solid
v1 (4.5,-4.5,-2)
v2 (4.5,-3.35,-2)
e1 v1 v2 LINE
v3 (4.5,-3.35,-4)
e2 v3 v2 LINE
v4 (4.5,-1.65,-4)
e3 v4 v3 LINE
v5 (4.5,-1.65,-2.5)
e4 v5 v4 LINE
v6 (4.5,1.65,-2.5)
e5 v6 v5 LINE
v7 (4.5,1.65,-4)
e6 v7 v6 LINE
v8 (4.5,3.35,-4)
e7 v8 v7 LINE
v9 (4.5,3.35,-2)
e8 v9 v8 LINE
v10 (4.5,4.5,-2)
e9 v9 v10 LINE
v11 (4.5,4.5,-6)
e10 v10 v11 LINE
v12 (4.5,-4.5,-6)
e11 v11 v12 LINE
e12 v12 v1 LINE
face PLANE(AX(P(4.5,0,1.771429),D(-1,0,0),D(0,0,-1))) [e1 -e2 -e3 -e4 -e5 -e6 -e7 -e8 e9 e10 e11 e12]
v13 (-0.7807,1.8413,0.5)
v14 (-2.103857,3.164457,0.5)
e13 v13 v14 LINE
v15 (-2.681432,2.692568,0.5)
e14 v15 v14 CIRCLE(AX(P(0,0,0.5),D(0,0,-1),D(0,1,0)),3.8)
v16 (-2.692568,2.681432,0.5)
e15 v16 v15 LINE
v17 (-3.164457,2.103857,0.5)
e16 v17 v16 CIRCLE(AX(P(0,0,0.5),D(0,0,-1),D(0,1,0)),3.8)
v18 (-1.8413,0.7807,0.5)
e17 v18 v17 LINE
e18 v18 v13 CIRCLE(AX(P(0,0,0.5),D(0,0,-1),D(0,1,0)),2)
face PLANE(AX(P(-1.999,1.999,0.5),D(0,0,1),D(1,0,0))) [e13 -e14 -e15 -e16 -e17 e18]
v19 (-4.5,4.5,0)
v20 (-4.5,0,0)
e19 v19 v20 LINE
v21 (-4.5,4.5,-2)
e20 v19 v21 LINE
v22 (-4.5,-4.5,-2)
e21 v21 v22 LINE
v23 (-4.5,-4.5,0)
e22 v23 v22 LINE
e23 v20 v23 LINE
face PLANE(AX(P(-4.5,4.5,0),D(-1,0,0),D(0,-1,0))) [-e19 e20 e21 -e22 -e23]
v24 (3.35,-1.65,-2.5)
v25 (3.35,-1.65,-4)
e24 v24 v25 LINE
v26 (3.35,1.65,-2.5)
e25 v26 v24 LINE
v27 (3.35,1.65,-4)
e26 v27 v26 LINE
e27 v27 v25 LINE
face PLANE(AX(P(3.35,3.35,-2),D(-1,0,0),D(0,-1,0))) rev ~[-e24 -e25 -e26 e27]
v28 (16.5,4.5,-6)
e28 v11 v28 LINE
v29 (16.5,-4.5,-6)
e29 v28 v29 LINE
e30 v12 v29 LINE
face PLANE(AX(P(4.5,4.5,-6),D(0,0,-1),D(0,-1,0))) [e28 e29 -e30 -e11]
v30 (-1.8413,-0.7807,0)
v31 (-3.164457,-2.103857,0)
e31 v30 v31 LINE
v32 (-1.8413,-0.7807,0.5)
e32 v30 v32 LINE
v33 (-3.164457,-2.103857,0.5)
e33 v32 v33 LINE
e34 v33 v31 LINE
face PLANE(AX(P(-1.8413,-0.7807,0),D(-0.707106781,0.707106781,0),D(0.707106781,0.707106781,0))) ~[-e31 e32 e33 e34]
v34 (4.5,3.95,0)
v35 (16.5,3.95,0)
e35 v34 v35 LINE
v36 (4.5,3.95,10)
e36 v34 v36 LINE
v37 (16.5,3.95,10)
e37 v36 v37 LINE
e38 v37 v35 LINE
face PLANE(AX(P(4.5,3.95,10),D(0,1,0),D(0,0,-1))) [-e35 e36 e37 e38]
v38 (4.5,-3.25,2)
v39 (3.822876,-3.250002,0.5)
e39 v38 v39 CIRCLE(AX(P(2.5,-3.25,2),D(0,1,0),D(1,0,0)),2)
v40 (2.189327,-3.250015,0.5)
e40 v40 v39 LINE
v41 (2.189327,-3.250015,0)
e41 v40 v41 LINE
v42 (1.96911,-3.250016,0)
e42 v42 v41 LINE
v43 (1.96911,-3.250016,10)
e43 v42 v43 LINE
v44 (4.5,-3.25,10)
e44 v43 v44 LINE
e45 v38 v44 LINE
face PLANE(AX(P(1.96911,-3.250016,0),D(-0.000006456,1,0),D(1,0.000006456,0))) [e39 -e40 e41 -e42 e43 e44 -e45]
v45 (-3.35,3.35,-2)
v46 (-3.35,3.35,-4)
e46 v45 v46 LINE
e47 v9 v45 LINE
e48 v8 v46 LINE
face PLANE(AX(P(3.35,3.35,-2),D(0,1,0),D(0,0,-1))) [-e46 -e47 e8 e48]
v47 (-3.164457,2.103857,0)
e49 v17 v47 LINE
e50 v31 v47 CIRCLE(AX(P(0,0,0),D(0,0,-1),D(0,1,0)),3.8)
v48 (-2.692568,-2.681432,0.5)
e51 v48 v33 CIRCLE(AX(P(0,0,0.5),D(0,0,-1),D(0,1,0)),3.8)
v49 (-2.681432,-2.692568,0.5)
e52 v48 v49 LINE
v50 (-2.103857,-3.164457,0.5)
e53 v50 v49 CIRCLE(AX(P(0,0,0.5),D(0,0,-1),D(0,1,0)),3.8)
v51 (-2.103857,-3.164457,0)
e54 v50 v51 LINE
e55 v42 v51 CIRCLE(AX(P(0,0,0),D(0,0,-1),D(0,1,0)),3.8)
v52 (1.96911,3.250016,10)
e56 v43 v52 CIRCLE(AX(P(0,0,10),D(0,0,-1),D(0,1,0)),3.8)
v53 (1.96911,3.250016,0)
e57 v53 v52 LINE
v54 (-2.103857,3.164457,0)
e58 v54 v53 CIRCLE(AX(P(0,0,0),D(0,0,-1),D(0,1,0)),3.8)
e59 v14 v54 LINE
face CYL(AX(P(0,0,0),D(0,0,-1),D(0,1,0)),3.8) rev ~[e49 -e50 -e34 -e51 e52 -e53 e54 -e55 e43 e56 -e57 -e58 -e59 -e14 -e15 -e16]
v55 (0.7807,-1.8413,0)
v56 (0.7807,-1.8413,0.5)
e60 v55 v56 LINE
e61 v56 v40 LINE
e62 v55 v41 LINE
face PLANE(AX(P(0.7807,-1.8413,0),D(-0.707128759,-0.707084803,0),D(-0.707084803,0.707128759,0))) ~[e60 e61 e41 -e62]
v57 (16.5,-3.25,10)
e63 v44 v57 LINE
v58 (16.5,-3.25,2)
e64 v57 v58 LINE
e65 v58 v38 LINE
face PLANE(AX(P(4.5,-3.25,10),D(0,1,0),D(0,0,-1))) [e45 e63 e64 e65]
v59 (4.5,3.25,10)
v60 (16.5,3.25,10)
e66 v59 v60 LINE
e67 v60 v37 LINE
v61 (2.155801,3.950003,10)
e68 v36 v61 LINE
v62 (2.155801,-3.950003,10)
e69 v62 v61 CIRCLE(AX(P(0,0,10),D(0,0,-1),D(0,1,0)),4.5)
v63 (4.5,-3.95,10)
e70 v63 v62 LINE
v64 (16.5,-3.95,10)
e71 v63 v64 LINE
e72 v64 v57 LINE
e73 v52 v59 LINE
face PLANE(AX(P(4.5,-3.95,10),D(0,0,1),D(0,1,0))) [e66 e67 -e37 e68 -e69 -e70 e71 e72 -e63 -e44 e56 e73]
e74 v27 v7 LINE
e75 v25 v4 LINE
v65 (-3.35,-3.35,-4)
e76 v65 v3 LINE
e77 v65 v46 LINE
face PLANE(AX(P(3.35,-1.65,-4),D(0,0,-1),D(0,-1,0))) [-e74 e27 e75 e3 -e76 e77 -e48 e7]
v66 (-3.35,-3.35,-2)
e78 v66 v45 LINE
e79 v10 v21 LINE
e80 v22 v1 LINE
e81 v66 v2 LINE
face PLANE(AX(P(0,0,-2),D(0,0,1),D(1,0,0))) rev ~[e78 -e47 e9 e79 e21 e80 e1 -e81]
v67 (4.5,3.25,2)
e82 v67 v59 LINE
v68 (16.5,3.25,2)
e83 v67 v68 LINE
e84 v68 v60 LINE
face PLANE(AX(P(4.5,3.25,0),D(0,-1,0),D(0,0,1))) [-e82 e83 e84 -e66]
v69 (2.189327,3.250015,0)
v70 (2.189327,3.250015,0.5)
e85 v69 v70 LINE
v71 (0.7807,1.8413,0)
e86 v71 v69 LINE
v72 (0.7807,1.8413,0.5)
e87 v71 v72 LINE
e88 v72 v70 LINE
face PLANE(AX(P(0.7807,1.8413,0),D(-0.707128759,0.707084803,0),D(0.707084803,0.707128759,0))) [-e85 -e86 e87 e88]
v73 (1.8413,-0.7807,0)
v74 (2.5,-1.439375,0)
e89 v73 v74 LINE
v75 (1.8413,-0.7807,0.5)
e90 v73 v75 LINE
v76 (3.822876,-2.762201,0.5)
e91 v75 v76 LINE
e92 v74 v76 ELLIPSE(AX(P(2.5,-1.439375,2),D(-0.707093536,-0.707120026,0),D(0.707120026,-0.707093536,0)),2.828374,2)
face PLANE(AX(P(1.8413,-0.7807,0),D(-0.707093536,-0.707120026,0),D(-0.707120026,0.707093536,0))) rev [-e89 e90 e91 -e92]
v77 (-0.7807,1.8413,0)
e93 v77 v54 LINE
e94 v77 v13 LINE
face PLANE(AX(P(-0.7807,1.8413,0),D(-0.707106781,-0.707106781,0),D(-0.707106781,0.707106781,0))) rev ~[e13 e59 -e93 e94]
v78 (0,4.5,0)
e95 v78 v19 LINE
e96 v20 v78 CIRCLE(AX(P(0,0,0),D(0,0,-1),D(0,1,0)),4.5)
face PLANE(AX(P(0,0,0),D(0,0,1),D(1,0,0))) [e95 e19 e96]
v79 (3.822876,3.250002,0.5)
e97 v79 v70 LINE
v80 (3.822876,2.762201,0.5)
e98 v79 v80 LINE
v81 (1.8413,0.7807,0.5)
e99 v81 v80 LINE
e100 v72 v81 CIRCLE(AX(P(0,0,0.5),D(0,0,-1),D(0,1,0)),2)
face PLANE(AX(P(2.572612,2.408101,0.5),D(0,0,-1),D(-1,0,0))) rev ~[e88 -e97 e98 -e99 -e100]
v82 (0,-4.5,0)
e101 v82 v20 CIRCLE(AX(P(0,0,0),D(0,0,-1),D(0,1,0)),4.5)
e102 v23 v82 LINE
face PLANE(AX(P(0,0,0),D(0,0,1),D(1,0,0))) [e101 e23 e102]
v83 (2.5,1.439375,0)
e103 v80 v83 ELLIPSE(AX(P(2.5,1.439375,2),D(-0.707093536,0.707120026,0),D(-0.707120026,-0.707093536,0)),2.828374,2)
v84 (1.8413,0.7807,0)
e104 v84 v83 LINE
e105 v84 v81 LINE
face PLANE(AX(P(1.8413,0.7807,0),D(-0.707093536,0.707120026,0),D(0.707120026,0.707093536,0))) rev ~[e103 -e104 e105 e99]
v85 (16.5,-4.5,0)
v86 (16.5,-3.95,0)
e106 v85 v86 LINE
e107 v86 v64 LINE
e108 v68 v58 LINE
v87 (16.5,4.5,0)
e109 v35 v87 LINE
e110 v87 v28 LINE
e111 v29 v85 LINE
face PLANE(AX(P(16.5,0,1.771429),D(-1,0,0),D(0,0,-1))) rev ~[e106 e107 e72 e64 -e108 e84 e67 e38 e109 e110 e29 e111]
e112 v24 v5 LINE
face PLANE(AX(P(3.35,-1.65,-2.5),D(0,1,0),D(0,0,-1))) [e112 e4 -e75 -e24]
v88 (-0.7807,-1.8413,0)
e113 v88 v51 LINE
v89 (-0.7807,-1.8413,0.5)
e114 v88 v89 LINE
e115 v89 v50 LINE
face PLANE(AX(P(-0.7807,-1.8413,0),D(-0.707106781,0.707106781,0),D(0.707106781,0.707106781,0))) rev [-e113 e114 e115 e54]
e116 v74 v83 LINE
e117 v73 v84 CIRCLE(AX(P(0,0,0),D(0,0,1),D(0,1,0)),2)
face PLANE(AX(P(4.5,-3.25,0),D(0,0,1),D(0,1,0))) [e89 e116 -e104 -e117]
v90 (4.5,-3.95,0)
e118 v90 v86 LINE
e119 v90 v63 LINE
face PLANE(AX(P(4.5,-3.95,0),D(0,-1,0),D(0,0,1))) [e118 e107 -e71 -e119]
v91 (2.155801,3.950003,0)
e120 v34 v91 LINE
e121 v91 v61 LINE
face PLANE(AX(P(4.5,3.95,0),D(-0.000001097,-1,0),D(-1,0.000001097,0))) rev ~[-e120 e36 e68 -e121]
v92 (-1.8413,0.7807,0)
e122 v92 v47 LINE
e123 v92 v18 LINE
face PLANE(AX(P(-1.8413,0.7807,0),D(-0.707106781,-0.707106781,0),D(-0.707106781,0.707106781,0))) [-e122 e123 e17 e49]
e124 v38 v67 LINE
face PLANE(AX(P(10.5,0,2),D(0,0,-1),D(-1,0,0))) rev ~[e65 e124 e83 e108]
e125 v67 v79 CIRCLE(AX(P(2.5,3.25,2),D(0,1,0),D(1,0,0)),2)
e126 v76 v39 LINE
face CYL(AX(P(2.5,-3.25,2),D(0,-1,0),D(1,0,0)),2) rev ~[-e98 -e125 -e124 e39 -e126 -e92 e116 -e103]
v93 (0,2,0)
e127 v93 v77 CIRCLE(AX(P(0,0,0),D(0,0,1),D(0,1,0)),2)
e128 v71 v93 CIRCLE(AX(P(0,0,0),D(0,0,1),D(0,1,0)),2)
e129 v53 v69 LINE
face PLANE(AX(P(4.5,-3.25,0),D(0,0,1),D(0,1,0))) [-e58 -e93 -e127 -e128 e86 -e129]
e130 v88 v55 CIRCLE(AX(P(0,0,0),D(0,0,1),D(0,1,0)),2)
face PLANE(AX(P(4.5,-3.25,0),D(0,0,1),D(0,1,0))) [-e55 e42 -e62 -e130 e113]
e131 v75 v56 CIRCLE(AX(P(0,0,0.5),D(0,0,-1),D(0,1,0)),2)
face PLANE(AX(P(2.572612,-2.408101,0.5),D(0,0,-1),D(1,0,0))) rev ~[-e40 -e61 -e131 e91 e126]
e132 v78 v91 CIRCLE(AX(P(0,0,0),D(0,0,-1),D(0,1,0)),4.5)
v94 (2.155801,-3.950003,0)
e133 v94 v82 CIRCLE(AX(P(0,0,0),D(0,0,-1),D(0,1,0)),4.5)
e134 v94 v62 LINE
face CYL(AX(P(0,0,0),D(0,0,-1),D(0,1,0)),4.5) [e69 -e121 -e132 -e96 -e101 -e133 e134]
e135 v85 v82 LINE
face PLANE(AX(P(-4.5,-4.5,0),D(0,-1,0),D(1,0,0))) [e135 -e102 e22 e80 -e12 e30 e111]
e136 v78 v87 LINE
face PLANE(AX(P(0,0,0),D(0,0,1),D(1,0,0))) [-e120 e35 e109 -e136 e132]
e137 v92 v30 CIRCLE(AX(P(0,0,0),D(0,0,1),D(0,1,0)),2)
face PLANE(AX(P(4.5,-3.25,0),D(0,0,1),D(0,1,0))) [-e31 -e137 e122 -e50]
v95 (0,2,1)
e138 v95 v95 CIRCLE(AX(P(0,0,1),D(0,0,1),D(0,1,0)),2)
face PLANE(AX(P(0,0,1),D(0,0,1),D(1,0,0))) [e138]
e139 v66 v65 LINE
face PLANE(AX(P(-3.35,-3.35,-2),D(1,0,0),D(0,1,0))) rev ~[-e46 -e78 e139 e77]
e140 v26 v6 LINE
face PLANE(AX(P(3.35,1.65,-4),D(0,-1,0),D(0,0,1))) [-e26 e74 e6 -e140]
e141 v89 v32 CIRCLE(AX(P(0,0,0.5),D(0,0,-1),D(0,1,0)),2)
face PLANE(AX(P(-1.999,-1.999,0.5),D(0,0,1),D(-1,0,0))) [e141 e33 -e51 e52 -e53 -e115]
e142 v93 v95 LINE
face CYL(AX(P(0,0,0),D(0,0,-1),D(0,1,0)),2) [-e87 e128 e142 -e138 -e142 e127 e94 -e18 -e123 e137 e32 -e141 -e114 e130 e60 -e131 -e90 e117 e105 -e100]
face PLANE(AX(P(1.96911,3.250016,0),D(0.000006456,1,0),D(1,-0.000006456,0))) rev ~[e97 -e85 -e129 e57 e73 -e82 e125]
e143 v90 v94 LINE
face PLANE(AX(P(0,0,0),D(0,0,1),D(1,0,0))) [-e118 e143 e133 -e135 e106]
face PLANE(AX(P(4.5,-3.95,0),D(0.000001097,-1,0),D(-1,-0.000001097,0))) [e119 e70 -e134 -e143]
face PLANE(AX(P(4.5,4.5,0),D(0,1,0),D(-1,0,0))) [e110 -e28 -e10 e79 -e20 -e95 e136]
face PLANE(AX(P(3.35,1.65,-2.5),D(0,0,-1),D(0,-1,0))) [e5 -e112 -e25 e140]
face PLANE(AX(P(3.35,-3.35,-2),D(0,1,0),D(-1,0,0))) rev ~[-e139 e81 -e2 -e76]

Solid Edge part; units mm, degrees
sketch "Sketch1" plane through (0, 0, 0) normal (0, 0, 1) x (1, 0, 0)
  line L0 (-4.5, -4.5) -> (4.5, -4.5)
  line L1 (4.5, -4.5) -> (4.5, 4.5)
  line L2 (4.5, 4.5) -> (-4.5, 4.5)
  line L3 (-4.5, 4.5) -> (-4.5, -4.5)
extrude "Protrusion1" add sketch "Sketch1" against normal blind 2
sketch "Sketch2" plane through (0, 0, -2) normal (0, 0, -1) x (1, 0, 0)
  line L0 (3.35, 3.35) -> (-3.35, 3.35)
  line L1 (-3.35, 3.35) -> (-3.35, -3.35)
  line L2 (-3.35, -3.35) -> (3.35, -3.35)
  line L3 (3.35, -3.35) -> (3.35, 3.35)
extrude "ExtrudedProtrusion_2" add sketch "Sketch2" along normal blind 2
sketch "Sketch3" plane through (3.35, 0, -3.5) normal (1, 0, 0) x (0, 1, 0)
  line L0 (1.65, -0.5) -> (1.65, 1)
  line L1 (1.65, 1) -> (-1.65, 1)
  line L2 (-1.65, 1) -> (-1.65, -0.5)
  line L3 (-1.65, -0.5) -> (-3.35, -0.5)
  line L4 (-3.35, -0.5) -> (-3.35, 1.5)
  line L5 (-3.35, 1.5) -> (3.35, 1.5)
  line L6 (3.35, 1.5) -> (3.35, -0.5)
  line L7 (3.35, -0.5) -> (1.65, -0.5)
extrude "Protrusion2" add sketch "Sketch3" along normal up to surface (1.15 mm away)
sketch "Sketch4" plane through (0, 0, 0) normal (0, 0, 1) x (0, 1, 0)
  circle A0 centre (0, 0) radius 2
extrude "ExtrudedProtrusion_4" add sketch "Sketch4" along normal blind 1
sketch "Sketch5" plane through (0, 0, 0) normal (0, 0, 1) x (0, 1, 0)
  line L0 (3.25, -1.9691) -> (3.25, -4.5)
  line L1 (3.25, -4.5) -> (3.95, -4.5)
  line L2 (3.95, -4.5) -> (3.95, -2.1558)
  line L3 (-3.95, -4.5) -> (-3.95, -2.1558)
  line L4 (-3.25, -4.5) -> (-3.95, -4.5)
  line L5 (-3.25, -1.9691) -> (-3.25, -4.5)
  arc A0 (-3.25, -1.9691) -> (3.25, -1.9691) centre (0, 0) cw
  arc A1 (-3.95, -2.1558) -> (3.95, -2.1558) centre (0, 0) cw
extrude "Protrusion3" add sketch "Sketch5" along normal blind 10
sketch "Sketch6" plane through (4.5, 0, 0.5) normal (1, 0, 0) x (0, 1, 0)
  line L0 (4.5, -6.5) -> (-4.5, -6.5)
  line L1 (-4.5, -6.5) -> (-4.5, -0.5)
  line L2 (-4.5, -0.5) -> (-3.95, -0.5)
  line L3 (-3.95, -0.5) -> (-3.95, 9.5)
  line L4 (-3.95, 9.5) -> (-3.25, 9.5)
  line L5 (-3.25, 9.5) -> (-3.25, -0.5)
  line L6 (-3.25, -0.5) -> (3.25, -0.5)
  line L7 (3.25, -0.5) -> (3.25, 9.5)
  line L8 (3.25, 9.5) -> (3.95, 9.5)
  line L9 (3.95, 9.5) -> (3.95, -0.5)
  line L10 (3.95, -0.5) -> (4.5, -0.5)
  line L11 (4.5, -0.5) -> (4.5, -6.5)
extrude "ExtrudedProtrusion_8" add sketch "Sketch6" along normal blind 12
sketch "Sketch7" plane through (6.25, 0, 0) normal (0, 0, 1) x (1, 0, 0)
  line L0 (-1.75, -3.25) -> (-1.75, 3.25)
  line L1 (-1.75, 3.25) -> (10.25, 3.25)
  line L2 (10.25, 3.25) -> (10.25, -3.25)
  line L3 (10.25, -3.25) -> (-1.75, -3.25)
extrude "ExtrudedProtrusion_9" add sketch "Sketch7" along normal blind 2
sketch "Sketch8" plane through (0.25, 0, 0) normal (0, 0, 1) x (0, 1, 0)
  line L0 (1.8413, -0.5307) -> (3.45, -2.1393)
  line L1 (3.45, -2.1393) -> (3.45, -4.2607)
  line L2 (0.7807, -1.5913) -> (3.45, -4.2607)
  line L3 (1.8413, -0.5307) -> (0.7807, -1.5913)
  line L4 (1.8413, 1.0307) -> (3.2173, 2.4067)
  line L5 (2.1567, 3.4673) -> (3.2173, 2.4067)
  line L6 (0.7807, 2.0913) -> (2.1567, 3.4673)
  line L7 (0.7807, 2.0913) -> (1.8413, 1.0307)
  dimension "D1" = 0.75
  dimension "D2" = 0.75
  dimension "D3" = 0.75
  dimension "D4" = 0.75
  dimension "D5" = 0.2
extrude "ExtrudedProtrusion_6" add sketch "Sketch8" along normal blind 0.5
mirror "Mirror1" about plane through (0.25, 0, 0) normal (0, 1, 0) of "ExtrudedProtrusion_6"
fillet "Round_1" radius 2 1 edges at (4.5, 0, 0)
